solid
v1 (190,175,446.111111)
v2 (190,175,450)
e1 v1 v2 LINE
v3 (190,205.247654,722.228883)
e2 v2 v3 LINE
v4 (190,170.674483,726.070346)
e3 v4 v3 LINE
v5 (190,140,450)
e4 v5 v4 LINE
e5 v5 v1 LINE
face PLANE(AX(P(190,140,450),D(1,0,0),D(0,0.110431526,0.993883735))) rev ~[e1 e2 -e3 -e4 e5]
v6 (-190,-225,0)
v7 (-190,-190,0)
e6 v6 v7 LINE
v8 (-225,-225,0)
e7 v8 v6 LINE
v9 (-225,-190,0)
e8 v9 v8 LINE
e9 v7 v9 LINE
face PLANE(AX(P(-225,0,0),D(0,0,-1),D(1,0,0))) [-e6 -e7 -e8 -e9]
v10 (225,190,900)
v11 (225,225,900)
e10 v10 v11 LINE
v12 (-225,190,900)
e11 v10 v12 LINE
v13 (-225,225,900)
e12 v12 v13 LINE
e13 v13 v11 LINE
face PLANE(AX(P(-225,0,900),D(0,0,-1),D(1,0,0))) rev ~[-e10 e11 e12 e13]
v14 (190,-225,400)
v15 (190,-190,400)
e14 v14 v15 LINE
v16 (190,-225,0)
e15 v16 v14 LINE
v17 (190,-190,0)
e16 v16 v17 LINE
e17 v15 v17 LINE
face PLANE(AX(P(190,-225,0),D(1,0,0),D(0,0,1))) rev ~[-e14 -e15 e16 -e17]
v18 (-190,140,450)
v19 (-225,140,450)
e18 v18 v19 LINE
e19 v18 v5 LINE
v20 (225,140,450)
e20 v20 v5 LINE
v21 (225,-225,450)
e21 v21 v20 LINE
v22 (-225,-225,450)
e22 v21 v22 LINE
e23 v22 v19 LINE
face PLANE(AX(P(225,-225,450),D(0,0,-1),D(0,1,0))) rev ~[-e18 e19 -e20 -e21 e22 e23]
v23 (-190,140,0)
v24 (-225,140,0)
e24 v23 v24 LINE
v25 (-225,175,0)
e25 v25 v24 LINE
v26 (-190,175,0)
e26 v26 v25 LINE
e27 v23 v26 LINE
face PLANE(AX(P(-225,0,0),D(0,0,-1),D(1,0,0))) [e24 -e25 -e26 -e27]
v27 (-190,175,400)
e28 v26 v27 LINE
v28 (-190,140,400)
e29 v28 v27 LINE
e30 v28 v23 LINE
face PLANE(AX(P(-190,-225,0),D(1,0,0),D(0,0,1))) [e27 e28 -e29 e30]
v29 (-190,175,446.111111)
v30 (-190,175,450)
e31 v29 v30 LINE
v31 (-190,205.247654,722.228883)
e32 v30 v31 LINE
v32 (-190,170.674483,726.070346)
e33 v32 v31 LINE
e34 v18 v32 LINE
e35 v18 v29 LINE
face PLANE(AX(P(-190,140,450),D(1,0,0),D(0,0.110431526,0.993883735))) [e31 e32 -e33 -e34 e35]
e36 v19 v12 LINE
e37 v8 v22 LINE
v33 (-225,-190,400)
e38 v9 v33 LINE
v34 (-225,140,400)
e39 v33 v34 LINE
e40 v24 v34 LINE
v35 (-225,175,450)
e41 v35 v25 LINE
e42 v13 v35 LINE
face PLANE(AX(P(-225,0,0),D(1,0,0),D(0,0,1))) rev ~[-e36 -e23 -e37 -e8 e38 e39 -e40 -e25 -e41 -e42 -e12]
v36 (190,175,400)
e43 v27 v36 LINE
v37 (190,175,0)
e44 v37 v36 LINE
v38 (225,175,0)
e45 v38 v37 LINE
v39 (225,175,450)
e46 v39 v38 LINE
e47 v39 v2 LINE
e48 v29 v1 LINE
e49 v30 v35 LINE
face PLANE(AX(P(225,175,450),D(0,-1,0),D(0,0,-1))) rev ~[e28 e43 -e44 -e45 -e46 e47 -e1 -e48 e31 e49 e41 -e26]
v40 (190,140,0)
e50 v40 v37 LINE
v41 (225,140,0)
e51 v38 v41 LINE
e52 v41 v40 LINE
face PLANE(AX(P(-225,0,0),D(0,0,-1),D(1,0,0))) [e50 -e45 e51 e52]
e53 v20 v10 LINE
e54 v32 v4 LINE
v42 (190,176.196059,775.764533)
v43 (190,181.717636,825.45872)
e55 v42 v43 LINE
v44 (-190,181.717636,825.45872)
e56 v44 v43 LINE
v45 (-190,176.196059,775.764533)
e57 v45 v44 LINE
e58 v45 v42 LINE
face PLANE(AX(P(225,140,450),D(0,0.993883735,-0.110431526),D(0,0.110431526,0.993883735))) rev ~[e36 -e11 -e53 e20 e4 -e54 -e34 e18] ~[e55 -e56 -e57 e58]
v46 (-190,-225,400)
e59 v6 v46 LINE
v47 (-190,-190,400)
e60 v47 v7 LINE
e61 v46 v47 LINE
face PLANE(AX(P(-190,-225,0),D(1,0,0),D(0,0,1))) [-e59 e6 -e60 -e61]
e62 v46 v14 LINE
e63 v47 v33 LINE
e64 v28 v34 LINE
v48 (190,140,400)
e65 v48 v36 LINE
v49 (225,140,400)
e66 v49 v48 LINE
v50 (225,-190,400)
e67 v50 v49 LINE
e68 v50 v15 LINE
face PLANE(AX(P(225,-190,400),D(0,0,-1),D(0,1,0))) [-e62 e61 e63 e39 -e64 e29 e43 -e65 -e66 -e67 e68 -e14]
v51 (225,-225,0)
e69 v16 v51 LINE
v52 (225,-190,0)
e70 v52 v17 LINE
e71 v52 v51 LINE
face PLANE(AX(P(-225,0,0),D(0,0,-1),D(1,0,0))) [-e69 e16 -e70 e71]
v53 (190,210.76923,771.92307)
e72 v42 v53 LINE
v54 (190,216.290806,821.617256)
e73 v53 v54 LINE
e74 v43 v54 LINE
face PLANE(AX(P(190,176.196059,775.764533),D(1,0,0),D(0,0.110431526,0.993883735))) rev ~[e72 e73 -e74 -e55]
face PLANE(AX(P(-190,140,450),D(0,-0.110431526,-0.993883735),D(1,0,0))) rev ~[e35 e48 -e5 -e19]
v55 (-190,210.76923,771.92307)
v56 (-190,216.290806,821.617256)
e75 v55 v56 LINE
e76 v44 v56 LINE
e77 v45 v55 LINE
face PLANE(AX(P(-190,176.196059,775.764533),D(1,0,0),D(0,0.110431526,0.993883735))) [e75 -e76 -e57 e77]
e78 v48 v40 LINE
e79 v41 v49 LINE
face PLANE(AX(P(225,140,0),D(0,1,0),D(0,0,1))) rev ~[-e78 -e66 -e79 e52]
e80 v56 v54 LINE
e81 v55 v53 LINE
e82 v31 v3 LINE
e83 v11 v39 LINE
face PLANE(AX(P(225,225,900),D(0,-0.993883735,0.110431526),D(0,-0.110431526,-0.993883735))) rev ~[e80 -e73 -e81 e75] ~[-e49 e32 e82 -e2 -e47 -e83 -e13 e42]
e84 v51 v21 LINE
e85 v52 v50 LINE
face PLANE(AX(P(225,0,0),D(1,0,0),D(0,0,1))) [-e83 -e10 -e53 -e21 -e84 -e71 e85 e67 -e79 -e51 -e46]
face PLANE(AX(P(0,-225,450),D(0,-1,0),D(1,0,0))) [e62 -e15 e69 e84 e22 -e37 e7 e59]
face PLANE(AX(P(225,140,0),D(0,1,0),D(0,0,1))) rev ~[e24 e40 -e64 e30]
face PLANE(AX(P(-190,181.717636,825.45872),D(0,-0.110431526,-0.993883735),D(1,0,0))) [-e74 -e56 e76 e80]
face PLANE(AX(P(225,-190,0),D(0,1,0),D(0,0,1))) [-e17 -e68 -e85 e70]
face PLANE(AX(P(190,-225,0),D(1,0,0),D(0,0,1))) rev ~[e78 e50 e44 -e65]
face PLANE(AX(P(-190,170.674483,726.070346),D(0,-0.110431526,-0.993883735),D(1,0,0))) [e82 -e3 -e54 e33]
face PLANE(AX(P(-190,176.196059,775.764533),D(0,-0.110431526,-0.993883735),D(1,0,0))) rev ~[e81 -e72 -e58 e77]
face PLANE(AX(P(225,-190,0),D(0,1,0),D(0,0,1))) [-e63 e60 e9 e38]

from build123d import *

# Parameters (mm, degrees)
F0_W     = 450
F0_H     = 900
F1_DEPTH = 225
F2_W     = 50
F2_H     = 50
F2_H_2   = 400
F2_W_2   = 330
F3_DEPTH = 450.001
F4_W     = 380
F4_H     = 400
F5_DEPTH = 450.001
F6_W     = 380
F6_H     = 277.7692569069
F6_H_2   = 50
F7_DEPTH = 134.1753041809


# Not quite as in the source:
# - a feature names something its author has since deleted; it is built from what else it names


with BuildPart() as f1:
    # F0 (on Front) → F1 (new body, symmetric)
    with BuildSketch(Plane.XZ):
        with Locations((0, 450)):
            Rectangle(F0_W, F0_H)
    extrude(amount=F1_DEPTH, both=True)

    # F2 (on face) → F3 (cut, through all)
    with BuildSketch(Plane.YZ.offset(225)):
        Polygon((-225, 450), (140, 450), (190, 900), (-225, 900), align=None)
        Polygon((175, 450), (225, 450), (225, 900), align=None)
        with Locations((200, 425)):
            Rectangle(F2_W, F2_H)
        with Locations((200, 200)):
            Rectangle(F2_W, F2_H_2)
        with Locations((-25, 200)):
            Rectangle(F2_W_2, F2_H_2)
    extrude(amount=-F3_DEPTH, mode=Mode.SUBTRACT)

    # F4 (on face) → F5 (cut, through all)
    with BuildSketch(Plane.XZ.offset(225)):
        with Locations((0, 200)):
            Rectangle(F4_W, F4_H)
    extrude(amount=-F5_DEPTH, mode=Mode.SUBTRACT)

    # F6 (on face) → F7 (cut, through all)
    with BuildSketch(Plane(origin=(0, 88.9024390244, -9.8780487805), x_dir=(1, 0, 0), z_dir=(0, -0.9938837347, 0.1104315261))):
        with Locations((0, 601.592722707)):
            Rectangle(F6_W, F6_H)
        with Locations((0, 815.4773511605)):
            Rectangle(F6_W, F6_H_2)
    extrude(amount=-F7_DEPTH, mode=Mode.SUBTRACT)


solid = f1.part
